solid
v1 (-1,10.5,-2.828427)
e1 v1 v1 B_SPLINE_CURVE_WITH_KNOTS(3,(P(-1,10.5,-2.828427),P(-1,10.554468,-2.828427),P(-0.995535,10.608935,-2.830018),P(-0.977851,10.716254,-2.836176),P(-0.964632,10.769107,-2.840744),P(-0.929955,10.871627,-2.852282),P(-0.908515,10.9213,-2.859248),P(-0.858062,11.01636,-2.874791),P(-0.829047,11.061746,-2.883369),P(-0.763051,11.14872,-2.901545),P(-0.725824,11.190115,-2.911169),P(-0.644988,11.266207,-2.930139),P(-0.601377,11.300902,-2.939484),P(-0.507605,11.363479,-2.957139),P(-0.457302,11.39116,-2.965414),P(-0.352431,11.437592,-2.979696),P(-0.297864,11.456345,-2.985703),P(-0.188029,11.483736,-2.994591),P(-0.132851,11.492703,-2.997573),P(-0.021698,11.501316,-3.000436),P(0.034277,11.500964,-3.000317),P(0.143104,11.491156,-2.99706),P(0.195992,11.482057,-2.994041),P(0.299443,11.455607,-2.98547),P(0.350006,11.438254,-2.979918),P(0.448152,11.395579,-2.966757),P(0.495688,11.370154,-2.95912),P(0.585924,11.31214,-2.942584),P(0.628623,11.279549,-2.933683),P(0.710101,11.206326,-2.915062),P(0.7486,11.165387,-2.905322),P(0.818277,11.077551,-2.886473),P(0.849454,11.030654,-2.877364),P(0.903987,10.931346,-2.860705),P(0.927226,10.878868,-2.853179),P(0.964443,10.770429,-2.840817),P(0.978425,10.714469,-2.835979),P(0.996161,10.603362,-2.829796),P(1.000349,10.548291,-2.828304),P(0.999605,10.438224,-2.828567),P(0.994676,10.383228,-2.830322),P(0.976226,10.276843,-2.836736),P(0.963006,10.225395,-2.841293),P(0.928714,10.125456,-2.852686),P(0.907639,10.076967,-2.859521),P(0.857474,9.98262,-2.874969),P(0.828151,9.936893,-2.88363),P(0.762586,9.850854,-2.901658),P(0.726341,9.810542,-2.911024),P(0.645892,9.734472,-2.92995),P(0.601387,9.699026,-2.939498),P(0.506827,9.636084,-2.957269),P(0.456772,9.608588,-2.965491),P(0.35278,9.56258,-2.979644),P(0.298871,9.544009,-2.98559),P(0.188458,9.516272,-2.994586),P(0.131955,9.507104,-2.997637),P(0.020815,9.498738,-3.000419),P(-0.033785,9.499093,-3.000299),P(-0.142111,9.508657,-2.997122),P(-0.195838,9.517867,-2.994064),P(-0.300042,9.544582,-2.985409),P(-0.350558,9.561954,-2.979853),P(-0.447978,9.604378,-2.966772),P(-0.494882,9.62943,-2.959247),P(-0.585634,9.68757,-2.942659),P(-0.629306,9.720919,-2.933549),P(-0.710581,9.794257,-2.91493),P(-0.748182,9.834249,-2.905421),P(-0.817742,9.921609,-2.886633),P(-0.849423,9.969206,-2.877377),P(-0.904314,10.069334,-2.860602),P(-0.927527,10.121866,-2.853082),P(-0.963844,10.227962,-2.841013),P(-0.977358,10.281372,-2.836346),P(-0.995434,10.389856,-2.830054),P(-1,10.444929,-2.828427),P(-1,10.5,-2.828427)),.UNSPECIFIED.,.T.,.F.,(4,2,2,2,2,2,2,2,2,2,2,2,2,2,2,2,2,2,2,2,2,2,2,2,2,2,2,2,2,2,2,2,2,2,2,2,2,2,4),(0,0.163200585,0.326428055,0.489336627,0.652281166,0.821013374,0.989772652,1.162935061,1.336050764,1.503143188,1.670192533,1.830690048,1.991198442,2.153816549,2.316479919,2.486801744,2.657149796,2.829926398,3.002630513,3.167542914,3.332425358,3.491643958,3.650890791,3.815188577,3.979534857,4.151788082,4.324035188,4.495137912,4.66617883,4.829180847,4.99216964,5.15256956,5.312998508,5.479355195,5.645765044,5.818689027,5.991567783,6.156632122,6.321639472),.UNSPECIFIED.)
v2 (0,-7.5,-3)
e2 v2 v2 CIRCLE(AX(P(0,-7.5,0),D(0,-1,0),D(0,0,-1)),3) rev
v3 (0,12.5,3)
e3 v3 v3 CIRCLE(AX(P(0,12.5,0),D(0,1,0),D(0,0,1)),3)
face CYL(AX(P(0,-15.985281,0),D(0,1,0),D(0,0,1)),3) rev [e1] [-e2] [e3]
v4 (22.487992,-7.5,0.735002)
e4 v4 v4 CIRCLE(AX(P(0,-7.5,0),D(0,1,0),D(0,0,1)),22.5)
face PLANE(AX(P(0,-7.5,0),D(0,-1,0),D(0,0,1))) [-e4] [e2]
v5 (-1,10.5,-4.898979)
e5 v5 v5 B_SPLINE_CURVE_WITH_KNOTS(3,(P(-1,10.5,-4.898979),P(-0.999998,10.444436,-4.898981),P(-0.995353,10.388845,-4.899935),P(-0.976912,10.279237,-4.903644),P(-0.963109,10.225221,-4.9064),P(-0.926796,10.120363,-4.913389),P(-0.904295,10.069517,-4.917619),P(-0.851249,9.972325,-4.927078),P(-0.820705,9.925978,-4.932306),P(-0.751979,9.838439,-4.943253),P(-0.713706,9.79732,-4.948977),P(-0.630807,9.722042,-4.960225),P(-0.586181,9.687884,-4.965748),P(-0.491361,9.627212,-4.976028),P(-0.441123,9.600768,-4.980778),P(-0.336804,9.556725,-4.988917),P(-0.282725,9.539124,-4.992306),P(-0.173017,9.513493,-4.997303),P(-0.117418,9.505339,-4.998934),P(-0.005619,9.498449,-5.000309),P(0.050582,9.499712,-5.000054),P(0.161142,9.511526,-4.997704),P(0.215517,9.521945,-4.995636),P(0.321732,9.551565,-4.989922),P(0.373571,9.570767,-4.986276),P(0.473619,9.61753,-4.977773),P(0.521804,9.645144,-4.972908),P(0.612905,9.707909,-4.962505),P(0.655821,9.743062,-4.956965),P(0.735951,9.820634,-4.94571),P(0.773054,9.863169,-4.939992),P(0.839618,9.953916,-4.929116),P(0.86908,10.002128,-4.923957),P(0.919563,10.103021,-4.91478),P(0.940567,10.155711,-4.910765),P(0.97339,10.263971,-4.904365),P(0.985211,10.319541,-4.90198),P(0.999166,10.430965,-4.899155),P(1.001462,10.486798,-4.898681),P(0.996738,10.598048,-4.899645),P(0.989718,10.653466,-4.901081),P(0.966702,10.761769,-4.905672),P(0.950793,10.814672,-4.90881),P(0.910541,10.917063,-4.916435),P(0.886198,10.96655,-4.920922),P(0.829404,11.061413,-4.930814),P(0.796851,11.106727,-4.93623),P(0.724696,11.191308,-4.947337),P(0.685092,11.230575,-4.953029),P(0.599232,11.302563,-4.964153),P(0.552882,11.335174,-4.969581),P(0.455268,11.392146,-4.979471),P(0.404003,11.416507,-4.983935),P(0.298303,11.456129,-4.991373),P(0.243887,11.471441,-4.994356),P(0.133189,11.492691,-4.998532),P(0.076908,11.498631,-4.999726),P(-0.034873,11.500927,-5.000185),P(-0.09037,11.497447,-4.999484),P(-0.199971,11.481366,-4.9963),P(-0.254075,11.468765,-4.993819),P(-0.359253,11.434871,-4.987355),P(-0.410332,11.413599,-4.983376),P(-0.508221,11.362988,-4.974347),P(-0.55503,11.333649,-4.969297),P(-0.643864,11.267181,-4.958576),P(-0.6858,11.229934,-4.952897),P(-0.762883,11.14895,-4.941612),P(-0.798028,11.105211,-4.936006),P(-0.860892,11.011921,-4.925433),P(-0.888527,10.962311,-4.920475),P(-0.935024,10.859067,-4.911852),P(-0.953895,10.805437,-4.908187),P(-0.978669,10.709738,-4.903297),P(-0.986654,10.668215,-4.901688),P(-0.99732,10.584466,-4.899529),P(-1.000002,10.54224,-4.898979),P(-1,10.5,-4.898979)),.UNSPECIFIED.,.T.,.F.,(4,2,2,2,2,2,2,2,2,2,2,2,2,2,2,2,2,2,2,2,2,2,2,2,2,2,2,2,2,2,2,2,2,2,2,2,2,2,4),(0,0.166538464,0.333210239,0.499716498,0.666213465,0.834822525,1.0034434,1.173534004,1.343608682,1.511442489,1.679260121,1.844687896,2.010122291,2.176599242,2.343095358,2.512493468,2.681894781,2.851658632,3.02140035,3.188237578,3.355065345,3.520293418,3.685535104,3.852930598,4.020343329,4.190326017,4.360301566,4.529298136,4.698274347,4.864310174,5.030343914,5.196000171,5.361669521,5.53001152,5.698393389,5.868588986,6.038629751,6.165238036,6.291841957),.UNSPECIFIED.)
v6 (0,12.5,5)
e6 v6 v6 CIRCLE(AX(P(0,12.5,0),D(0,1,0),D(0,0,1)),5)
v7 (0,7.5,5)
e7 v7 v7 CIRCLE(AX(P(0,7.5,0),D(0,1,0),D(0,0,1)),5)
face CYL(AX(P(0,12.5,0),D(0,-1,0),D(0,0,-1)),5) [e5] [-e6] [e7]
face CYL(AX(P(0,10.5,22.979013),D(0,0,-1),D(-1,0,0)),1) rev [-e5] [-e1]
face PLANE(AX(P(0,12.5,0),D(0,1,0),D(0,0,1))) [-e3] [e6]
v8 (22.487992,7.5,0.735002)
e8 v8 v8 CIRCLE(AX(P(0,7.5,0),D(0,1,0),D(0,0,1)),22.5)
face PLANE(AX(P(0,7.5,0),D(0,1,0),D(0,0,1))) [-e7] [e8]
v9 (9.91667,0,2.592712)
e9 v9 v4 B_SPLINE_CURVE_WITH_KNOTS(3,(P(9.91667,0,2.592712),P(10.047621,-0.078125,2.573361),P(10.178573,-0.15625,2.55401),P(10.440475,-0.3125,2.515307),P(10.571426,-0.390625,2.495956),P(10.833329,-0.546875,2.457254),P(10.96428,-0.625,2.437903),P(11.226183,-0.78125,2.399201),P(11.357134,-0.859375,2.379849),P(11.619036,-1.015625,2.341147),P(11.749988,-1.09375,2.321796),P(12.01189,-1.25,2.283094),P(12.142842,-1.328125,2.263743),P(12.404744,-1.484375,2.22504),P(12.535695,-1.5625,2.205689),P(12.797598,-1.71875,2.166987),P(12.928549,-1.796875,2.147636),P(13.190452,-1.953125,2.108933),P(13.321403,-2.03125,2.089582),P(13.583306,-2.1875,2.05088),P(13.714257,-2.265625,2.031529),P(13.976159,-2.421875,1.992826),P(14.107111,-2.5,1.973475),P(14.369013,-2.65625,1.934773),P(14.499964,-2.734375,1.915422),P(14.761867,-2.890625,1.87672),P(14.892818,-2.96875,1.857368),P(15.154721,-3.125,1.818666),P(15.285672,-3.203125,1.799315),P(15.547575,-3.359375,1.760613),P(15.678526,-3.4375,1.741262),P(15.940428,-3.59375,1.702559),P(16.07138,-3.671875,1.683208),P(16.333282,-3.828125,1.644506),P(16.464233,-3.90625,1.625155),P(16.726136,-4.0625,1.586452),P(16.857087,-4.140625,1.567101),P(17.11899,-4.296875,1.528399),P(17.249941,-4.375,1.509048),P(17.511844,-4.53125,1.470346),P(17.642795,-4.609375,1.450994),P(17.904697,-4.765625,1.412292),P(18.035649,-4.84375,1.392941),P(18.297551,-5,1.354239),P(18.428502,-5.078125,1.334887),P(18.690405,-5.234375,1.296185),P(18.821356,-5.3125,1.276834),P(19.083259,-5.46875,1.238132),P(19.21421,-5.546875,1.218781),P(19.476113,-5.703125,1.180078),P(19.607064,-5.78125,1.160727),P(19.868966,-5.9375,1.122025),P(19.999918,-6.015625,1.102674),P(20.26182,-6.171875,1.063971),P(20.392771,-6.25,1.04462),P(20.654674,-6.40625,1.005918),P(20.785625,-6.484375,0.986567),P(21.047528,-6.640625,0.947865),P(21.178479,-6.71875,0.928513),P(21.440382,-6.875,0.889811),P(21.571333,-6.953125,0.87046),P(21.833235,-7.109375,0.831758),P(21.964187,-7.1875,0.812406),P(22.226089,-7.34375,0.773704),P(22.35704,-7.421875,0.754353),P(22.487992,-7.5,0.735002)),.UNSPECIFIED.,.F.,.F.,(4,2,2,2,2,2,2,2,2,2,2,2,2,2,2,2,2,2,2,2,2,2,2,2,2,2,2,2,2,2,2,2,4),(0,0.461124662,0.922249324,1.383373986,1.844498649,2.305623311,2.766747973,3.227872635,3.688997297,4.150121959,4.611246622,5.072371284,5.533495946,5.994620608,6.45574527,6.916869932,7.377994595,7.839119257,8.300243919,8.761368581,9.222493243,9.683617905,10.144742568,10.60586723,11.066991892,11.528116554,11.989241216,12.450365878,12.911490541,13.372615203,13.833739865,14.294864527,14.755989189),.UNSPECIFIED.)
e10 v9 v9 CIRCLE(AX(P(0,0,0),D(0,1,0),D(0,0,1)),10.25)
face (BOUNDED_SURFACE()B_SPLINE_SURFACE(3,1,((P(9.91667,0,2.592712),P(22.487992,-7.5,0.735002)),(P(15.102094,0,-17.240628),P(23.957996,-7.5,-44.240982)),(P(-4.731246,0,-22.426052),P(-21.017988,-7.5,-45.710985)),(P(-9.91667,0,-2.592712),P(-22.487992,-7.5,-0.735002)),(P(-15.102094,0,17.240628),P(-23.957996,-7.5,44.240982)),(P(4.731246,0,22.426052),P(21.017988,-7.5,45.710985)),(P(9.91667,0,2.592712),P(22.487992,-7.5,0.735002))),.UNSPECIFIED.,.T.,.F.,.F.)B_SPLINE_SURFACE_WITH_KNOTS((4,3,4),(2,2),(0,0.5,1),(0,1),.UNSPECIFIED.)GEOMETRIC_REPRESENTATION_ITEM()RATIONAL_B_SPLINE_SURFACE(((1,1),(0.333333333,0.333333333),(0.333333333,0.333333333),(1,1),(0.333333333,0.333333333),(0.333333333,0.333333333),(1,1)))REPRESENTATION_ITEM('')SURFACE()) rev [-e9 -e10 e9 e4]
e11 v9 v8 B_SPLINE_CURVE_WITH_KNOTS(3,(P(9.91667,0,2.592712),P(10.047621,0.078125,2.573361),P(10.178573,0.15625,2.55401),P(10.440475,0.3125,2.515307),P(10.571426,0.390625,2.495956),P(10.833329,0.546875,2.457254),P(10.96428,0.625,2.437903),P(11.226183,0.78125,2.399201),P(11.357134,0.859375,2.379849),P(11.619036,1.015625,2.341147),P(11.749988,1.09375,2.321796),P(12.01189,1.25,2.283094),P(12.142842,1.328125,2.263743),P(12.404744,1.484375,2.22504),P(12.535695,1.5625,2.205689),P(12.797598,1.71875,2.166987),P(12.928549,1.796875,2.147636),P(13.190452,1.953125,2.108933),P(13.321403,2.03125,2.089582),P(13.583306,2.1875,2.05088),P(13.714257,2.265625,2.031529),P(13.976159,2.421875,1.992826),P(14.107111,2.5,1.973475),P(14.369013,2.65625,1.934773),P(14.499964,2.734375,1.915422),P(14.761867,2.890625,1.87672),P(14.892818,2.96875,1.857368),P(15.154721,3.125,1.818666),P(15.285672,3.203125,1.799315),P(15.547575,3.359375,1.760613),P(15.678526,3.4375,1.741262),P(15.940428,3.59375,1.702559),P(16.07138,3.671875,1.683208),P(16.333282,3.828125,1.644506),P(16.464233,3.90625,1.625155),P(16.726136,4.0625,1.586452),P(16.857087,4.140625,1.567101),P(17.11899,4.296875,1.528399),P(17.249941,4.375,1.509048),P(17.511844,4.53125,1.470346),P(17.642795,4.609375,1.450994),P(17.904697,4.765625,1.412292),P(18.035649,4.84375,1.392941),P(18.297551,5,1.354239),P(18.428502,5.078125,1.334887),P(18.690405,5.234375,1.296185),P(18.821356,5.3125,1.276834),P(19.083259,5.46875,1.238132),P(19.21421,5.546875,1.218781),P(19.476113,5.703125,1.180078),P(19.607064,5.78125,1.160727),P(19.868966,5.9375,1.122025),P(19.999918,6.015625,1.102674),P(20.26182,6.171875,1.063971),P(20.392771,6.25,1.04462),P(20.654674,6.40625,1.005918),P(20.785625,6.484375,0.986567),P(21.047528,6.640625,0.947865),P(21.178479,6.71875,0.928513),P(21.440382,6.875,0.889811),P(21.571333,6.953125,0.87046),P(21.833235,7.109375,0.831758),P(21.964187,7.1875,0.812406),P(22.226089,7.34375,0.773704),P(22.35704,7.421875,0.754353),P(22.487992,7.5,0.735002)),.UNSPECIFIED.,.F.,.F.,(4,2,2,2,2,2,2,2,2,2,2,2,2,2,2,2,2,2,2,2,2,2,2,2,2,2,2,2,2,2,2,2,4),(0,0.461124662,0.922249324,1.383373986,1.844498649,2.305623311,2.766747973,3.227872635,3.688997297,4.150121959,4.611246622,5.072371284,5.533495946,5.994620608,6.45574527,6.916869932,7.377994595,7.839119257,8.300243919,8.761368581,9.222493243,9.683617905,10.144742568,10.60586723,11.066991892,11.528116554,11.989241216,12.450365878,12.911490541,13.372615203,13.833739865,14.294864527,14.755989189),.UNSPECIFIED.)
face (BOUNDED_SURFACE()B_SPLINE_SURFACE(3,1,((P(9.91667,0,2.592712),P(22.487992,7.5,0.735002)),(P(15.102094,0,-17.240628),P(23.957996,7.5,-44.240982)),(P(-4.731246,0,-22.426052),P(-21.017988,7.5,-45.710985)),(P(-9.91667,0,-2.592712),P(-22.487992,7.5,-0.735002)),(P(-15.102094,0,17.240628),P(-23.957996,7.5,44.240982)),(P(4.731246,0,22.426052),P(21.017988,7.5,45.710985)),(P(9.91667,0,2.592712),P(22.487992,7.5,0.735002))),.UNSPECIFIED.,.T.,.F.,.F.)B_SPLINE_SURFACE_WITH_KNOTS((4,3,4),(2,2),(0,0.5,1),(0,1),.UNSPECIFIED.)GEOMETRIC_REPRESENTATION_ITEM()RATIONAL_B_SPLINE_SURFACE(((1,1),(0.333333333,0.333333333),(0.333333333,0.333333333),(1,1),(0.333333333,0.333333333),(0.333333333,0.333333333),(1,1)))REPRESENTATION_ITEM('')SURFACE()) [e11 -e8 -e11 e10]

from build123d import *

# Parameters (mm, degrees)
SKETCH3_R               = 5
BOSS_EXTRUDE1_DEPTH     = 5
SKETCH4_R               = 3
CUT_EXTRUDE3_DEPTH      = 20
CUT_EXTRUDE2_REACH      = 39.666
CUT_EXTRUDE2_END_RADIUS = 3
SKETCH6_R               = 1


with BuildPart() as part:
    # Loft1: read off the stored shape, not the designer's step
    # Loft1: loft between two sections, ruled curve by curve
    loft1_from = [
        Edge.make_bspline([(9.916670011, 0, 2.592712073), (15.102094157, 0, -17.240627949), (-4.731245866, 0, -22.426052095), (-9.916670011, 0, -2.592712073), (-15.102094157, 0, 17.240627949), (4.731245866, 0, 22.426052095), (9.916670011, 0, 2.592712073)], [0, 0, 0, 0, 0.5, 0.5, 0.5, 1, 1, 1, 1], 3, [1, 0.333333333, 0.333333333, 1, 0.333333333, 0.333333333, 1]),
    ]
    loft1_to = [
        Edge.make_bspline([(22.487991734, 7.5, 0.735001896), (23.957995526, 7.5, -44.240981571), (-21.017987942, 7.5, -45.710985363), (-22.487991734, 7.5, -0.735001896), (-23.957995526, 7.5, 44.240981571), (21.017987942, 7.5, 45.710985363), (22.487991734, 7.5, 0.735001896)], [0, 0, 0, 0, 0.5, 0.5, 0.5, 1, 1, 1, 1], 3, [1, 0.333333333, 0.333333333, 1, 0.333333333, 0.333333333, 1]),
    ]
    loft1 = Solid(Shell([*[Face.make_surface_from_curves(loft1_from[k], loft1_to[k]) for k in range(1)], Face(Wire(loft1_from)), Face(Wire(loft1_to))]))
    add(loft1)

    # Mirror1: Loft1 across plane
    add(loft1.mirror(Plane.ZX))

    # Sketch3 → Boss-Extrude1 (add)
    with BuildSketch(Plane(origin=(0, 7.5, 0), x_dir=(1, 0, 0), z_dir=(0, 1, 0))):
        with Locations(Location((0, 0, 0), (0, 0, 270))):
            Circle(SKETCH3_R)
    extrude(amount=BOSS_EXTRUDE1_DEPTH)

    # Sketch4 → Cut-Extrude3 (cut)
    with BuildSketch(Plane(origin=(0, 12.5, 0), x_dir=(1, 0, 0), z_dir=(0, 1, 0))):
        with Locations(Location((0, 0, 0), (0, 0, 270))):
            Circle(SKETCH4_R)
    extrude(amount=-CUT_EXTRUDE3_DEPTH, mode=Mode.SUBTRACT)

    # Cut-Extrude2: up to this cylinder (the profile starts outside it)
    cut_extrude2_end = Plane(origin=(0, 10.5, 0), z_dir=(0, 1, 0)) * Cylinder(CUT_EXTRUDE2_END_RADIUS, 86.332, mode=Mode.PRIVATE)
    # Sketch6 → Cut-Extrude2 (cut, up to the surface)
    with BuildSketch(Plane.XY.offset(-5), mode=Mode.PRIVATE) as cut_extrude2_sk1:
        with Locations(Location((0, 10.5, 0), (0, 0, 180))):
            Circle(SKETCH6_R)
    cut_extrude2_tool1 = extrude(cut_extrude2_sk1.sketch, amount=CUT_EXTRUDE2_REACH, mode=Mode.PRIVATE) - cut_extrude2_end
    add(cut_extrude2_tool1.solids().sort_by_distance((0, 10.5, -5))[0], mode=Mode.SUBTRACT)


solid = part.part
